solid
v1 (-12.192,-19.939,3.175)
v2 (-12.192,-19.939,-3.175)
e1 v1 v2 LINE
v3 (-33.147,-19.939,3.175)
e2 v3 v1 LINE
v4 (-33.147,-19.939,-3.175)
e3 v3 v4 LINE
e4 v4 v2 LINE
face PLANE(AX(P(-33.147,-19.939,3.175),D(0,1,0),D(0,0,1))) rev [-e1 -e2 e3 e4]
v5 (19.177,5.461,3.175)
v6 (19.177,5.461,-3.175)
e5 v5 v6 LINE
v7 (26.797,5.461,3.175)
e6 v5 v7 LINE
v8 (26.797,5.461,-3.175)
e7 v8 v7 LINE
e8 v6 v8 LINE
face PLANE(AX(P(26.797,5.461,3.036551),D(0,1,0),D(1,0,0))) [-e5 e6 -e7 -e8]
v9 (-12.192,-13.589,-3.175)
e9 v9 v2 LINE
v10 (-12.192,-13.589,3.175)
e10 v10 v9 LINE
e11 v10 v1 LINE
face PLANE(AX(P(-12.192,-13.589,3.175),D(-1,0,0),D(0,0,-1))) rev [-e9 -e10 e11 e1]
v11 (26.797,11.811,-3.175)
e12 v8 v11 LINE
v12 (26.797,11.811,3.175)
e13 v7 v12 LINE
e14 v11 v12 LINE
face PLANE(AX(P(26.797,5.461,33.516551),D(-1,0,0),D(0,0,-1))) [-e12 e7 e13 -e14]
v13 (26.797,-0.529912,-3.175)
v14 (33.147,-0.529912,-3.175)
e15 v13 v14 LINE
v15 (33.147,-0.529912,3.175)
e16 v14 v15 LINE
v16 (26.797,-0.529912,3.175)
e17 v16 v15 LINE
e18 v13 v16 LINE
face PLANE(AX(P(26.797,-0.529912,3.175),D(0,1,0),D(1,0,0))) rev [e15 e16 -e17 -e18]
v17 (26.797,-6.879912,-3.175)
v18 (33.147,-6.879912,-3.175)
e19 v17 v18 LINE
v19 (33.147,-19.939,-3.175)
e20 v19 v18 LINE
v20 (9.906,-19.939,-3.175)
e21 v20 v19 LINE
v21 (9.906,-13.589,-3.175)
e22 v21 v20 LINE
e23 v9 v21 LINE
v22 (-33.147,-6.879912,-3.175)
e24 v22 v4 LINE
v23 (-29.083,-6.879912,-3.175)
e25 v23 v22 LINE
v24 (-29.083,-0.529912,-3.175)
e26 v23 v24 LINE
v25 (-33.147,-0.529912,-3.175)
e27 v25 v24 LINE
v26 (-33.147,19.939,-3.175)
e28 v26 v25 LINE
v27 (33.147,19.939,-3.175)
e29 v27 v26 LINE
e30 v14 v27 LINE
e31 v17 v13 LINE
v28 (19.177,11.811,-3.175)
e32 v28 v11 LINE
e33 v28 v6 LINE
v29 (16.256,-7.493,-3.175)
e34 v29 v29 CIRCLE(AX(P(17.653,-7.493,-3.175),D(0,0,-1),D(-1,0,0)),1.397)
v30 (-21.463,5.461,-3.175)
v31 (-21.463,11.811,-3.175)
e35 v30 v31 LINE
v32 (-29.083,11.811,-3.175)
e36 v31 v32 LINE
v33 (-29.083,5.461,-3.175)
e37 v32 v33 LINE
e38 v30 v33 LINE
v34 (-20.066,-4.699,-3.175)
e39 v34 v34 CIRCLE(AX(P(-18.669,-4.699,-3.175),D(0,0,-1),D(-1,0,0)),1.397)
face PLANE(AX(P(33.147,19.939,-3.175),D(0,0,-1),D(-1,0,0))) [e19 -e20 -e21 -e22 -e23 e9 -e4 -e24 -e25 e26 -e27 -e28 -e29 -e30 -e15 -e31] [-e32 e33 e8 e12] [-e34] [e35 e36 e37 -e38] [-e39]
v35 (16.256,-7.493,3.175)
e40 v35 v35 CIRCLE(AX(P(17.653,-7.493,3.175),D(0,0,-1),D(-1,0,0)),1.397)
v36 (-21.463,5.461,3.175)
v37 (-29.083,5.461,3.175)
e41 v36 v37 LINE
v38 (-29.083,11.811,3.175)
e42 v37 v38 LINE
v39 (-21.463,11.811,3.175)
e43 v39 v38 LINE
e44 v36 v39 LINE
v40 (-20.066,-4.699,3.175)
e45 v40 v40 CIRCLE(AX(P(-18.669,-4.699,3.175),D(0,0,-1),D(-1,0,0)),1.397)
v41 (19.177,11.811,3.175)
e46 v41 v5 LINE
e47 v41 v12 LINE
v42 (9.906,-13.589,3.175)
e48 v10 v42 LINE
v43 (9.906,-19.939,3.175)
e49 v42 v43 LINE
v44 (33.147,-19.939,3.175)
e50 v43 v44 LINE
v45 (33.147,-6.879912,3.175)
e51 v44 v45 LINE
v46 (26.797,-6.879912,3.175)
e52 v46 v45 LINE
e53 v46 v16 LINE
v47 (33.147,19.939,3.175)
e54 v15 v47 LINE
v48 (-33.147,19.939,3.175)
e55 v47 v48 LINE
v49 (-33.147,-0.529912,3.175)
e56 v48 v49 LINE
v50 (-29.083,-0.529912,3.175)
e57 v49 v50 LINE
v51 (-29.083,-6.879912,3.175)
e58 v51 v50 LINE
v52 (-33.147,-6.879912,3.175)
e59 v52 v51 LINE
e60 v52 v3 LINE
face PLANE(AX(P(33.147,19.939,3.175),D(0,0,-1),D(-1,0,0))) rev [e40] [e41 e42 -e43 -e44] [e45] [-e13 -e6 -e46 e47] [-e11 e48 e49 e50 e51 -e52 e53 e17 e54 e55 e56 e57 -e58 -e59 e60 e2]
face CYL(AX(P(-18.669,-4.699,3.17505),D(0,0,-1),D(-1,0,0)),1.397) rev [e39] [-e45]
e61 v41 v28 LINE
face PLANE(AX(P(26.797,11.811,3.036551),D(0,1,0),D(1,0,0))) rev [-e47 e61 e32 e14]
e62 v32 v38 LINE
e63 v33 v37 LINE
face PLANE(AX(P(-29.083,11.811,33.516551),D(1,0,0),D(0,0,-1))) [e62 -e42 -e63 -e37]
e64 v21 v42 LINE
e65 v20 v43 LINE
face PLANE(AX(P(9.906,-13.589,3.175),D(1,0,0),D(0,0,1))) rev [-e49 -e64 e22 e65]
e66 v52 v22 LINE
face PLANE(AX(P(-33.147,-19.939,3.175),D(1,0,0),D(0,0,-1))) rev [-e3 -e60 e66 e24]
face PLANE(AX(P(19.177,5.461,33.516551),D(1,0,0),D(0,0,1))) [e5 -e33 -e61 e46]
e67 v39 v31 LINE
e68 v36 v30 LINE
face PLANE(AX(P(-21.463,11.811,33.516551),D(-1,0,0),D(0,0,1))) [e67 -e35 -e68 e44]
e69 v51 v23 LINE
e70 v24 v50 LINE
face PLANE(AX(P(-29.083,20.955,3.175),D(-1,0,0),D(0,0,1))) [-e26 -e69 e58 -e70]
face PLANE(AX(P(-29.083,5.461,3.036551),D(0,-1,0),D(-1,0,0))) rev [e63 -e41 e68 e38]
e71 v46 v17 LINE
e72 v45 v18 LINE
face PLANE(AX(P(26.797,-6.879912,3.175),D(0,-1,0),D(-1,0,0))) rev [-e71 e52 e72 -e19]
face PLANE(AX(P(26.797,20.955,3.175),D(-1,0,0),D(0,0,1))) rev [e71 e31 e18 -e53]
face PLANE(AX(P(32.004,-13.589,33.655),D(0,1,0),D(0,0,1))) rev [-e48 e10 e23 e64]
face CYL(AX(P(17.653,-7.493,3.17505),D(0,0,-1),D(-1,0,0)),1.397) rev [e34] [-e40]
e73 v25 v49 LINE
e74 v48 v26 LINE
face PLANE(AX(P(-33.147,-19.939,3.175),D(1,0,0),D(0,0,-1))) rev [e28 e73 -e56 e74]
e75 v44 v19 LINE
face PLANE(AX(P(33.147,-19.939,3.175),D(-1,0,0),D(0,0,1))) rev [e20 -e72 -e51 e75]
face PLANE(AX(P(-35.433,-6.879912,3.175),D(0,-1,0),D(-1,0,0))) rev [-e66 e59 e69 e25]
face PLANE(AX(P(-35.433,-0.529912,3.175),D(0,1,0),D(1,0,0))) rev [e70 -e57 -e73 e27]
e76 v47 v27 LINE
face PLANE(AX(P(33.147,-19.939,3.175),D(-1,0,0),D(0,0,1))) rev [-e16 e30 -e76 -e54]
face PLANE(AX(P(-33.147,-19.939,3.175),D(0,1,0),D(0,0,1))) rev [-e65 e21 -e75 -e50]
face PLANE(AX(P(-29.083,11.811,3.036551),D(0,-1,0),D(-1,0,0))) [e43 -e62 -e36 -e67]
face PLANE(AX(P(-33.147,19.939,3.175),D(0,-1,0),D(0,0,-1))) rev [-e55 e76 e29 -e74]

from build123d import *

# Parameters (mm, degrees)
SKETCH1_W             = 66.294
SKETCH1_H             = 39.878
BOSS_EXTRUDE1_DEPTH   = 3.175
CAVITY1_START         = -19.939
CAVITY1_OUTLINE_W     = 22.098
CAVITY1_OUTLINE_H     = 6.35
CAVITY1_DEPTH         = 6.35
CAVITY1_START_2       = 5.461
CAVITY1_2_OUTLINE_W   = 7.62
CAVITY1_2_OUTLINE_H   = 6.35
CAVITY1_2_DEPTH       = 6.35
CAVITY1_START_3       = -6.879912323
CAVITY1_3_OUTLINE_W   = 6.35
CAVITY1_3_OUTLINE_H   = 6.35
CAVITY1_3_OUTLINE_W_2 = 4.064
CAVITY1_3_DEPTH       = 6.35
SKETCH4_R             = 1.397
CUT_EXTRUDE1_DEPTH    = 40.199615177


# Read off the part's stored shape, not the designer's step: Cavity1
with BuildPart() as part:
    # Sketch1 → Boss-Extrude1 (new, symmetric)
    with BuildSketch(Plane.XY):
        Rectangle(SKETCH1_W, SKETCH1_H)
    extrude(amount=BOSS_EXTRUDE1_DEPTH, both=True)

    # Cavity1 outline → Cavity1 (cut)
    with BuildSketch(Plane(origin=(0, 0, 0), x_dir=(1, 0, 0), z_dir=(0, 1, 0)).offset(CAVITY1_START)):
        with Locations((-1.143, 0)):
            Rectangle(CAVITY1_OUTLINE_W, CAVITY1_OUTLINE_H)
    extrude(amount=CAVITY1_DEPTH, mode=Mode.SUBTRACT)

    # Cavity1 2 outline → Cavity1 2 (cut)
    with BuildSketch(Plane(origin=(0, 0, 0), x_dir=(1, 0, 0), z_dir=(0, 1, 0)).offset(CAVITY1_START_2)):
        with Locations((22.987, 0)):
            Rectangle(CAVITY1_2_OUTLINE_W, CAVITY1_2_OUTLINE_H)
        with Locations((-25.273, 0)):
            Rectangle(CAVITY1_2_OUTLINE_W, CAVITY1_2_OUTLINE_H)
    extrude(amount=CAVITY1_2_DEPTH, mode=Mode.SUBTRACT)

    # Cavity1 3 outline → Cavity1 3 (cut)
    with BuildSketch(Plane(origin=(0, 0, 0), x_dir=(1, 0, 0), z_dir=(0, 1, 0)).offset(CAVITY1_START_3)):
        with Locations((29.972, 0)):
            Rectangle(CAVITY1_3_OUTLINE_W, CAVITY1_3_OUTLINE_H)
        with Locations((-31.115, 0)):
            Rectangle(CAVITY1_3_OUTLINE_W_2, CAVITY1_3_OUTLINE_H)
    extrude(amount=CAVITY1_3_DEPTH, mode=Mode.SUBTRACT)

    # Sketch4 → Cut-Extrude1 (cut, through all)
    with BuildSketch(Plane(origin=(0, 0, -3.175), x_dir=(-1, 0, 0), z_dir=(0, 0, -1))):
        with Locations((-17.653, -7.493)):
            Circle(SKETCH4_R)
        with Locations((18.669, -4.699)):
            Circle(SKETCH4_R)
    extrude(amount=-CUT_EXTRUDE1_DEPTH, mode=Mode.SUBTRACT)


solid = part.part
